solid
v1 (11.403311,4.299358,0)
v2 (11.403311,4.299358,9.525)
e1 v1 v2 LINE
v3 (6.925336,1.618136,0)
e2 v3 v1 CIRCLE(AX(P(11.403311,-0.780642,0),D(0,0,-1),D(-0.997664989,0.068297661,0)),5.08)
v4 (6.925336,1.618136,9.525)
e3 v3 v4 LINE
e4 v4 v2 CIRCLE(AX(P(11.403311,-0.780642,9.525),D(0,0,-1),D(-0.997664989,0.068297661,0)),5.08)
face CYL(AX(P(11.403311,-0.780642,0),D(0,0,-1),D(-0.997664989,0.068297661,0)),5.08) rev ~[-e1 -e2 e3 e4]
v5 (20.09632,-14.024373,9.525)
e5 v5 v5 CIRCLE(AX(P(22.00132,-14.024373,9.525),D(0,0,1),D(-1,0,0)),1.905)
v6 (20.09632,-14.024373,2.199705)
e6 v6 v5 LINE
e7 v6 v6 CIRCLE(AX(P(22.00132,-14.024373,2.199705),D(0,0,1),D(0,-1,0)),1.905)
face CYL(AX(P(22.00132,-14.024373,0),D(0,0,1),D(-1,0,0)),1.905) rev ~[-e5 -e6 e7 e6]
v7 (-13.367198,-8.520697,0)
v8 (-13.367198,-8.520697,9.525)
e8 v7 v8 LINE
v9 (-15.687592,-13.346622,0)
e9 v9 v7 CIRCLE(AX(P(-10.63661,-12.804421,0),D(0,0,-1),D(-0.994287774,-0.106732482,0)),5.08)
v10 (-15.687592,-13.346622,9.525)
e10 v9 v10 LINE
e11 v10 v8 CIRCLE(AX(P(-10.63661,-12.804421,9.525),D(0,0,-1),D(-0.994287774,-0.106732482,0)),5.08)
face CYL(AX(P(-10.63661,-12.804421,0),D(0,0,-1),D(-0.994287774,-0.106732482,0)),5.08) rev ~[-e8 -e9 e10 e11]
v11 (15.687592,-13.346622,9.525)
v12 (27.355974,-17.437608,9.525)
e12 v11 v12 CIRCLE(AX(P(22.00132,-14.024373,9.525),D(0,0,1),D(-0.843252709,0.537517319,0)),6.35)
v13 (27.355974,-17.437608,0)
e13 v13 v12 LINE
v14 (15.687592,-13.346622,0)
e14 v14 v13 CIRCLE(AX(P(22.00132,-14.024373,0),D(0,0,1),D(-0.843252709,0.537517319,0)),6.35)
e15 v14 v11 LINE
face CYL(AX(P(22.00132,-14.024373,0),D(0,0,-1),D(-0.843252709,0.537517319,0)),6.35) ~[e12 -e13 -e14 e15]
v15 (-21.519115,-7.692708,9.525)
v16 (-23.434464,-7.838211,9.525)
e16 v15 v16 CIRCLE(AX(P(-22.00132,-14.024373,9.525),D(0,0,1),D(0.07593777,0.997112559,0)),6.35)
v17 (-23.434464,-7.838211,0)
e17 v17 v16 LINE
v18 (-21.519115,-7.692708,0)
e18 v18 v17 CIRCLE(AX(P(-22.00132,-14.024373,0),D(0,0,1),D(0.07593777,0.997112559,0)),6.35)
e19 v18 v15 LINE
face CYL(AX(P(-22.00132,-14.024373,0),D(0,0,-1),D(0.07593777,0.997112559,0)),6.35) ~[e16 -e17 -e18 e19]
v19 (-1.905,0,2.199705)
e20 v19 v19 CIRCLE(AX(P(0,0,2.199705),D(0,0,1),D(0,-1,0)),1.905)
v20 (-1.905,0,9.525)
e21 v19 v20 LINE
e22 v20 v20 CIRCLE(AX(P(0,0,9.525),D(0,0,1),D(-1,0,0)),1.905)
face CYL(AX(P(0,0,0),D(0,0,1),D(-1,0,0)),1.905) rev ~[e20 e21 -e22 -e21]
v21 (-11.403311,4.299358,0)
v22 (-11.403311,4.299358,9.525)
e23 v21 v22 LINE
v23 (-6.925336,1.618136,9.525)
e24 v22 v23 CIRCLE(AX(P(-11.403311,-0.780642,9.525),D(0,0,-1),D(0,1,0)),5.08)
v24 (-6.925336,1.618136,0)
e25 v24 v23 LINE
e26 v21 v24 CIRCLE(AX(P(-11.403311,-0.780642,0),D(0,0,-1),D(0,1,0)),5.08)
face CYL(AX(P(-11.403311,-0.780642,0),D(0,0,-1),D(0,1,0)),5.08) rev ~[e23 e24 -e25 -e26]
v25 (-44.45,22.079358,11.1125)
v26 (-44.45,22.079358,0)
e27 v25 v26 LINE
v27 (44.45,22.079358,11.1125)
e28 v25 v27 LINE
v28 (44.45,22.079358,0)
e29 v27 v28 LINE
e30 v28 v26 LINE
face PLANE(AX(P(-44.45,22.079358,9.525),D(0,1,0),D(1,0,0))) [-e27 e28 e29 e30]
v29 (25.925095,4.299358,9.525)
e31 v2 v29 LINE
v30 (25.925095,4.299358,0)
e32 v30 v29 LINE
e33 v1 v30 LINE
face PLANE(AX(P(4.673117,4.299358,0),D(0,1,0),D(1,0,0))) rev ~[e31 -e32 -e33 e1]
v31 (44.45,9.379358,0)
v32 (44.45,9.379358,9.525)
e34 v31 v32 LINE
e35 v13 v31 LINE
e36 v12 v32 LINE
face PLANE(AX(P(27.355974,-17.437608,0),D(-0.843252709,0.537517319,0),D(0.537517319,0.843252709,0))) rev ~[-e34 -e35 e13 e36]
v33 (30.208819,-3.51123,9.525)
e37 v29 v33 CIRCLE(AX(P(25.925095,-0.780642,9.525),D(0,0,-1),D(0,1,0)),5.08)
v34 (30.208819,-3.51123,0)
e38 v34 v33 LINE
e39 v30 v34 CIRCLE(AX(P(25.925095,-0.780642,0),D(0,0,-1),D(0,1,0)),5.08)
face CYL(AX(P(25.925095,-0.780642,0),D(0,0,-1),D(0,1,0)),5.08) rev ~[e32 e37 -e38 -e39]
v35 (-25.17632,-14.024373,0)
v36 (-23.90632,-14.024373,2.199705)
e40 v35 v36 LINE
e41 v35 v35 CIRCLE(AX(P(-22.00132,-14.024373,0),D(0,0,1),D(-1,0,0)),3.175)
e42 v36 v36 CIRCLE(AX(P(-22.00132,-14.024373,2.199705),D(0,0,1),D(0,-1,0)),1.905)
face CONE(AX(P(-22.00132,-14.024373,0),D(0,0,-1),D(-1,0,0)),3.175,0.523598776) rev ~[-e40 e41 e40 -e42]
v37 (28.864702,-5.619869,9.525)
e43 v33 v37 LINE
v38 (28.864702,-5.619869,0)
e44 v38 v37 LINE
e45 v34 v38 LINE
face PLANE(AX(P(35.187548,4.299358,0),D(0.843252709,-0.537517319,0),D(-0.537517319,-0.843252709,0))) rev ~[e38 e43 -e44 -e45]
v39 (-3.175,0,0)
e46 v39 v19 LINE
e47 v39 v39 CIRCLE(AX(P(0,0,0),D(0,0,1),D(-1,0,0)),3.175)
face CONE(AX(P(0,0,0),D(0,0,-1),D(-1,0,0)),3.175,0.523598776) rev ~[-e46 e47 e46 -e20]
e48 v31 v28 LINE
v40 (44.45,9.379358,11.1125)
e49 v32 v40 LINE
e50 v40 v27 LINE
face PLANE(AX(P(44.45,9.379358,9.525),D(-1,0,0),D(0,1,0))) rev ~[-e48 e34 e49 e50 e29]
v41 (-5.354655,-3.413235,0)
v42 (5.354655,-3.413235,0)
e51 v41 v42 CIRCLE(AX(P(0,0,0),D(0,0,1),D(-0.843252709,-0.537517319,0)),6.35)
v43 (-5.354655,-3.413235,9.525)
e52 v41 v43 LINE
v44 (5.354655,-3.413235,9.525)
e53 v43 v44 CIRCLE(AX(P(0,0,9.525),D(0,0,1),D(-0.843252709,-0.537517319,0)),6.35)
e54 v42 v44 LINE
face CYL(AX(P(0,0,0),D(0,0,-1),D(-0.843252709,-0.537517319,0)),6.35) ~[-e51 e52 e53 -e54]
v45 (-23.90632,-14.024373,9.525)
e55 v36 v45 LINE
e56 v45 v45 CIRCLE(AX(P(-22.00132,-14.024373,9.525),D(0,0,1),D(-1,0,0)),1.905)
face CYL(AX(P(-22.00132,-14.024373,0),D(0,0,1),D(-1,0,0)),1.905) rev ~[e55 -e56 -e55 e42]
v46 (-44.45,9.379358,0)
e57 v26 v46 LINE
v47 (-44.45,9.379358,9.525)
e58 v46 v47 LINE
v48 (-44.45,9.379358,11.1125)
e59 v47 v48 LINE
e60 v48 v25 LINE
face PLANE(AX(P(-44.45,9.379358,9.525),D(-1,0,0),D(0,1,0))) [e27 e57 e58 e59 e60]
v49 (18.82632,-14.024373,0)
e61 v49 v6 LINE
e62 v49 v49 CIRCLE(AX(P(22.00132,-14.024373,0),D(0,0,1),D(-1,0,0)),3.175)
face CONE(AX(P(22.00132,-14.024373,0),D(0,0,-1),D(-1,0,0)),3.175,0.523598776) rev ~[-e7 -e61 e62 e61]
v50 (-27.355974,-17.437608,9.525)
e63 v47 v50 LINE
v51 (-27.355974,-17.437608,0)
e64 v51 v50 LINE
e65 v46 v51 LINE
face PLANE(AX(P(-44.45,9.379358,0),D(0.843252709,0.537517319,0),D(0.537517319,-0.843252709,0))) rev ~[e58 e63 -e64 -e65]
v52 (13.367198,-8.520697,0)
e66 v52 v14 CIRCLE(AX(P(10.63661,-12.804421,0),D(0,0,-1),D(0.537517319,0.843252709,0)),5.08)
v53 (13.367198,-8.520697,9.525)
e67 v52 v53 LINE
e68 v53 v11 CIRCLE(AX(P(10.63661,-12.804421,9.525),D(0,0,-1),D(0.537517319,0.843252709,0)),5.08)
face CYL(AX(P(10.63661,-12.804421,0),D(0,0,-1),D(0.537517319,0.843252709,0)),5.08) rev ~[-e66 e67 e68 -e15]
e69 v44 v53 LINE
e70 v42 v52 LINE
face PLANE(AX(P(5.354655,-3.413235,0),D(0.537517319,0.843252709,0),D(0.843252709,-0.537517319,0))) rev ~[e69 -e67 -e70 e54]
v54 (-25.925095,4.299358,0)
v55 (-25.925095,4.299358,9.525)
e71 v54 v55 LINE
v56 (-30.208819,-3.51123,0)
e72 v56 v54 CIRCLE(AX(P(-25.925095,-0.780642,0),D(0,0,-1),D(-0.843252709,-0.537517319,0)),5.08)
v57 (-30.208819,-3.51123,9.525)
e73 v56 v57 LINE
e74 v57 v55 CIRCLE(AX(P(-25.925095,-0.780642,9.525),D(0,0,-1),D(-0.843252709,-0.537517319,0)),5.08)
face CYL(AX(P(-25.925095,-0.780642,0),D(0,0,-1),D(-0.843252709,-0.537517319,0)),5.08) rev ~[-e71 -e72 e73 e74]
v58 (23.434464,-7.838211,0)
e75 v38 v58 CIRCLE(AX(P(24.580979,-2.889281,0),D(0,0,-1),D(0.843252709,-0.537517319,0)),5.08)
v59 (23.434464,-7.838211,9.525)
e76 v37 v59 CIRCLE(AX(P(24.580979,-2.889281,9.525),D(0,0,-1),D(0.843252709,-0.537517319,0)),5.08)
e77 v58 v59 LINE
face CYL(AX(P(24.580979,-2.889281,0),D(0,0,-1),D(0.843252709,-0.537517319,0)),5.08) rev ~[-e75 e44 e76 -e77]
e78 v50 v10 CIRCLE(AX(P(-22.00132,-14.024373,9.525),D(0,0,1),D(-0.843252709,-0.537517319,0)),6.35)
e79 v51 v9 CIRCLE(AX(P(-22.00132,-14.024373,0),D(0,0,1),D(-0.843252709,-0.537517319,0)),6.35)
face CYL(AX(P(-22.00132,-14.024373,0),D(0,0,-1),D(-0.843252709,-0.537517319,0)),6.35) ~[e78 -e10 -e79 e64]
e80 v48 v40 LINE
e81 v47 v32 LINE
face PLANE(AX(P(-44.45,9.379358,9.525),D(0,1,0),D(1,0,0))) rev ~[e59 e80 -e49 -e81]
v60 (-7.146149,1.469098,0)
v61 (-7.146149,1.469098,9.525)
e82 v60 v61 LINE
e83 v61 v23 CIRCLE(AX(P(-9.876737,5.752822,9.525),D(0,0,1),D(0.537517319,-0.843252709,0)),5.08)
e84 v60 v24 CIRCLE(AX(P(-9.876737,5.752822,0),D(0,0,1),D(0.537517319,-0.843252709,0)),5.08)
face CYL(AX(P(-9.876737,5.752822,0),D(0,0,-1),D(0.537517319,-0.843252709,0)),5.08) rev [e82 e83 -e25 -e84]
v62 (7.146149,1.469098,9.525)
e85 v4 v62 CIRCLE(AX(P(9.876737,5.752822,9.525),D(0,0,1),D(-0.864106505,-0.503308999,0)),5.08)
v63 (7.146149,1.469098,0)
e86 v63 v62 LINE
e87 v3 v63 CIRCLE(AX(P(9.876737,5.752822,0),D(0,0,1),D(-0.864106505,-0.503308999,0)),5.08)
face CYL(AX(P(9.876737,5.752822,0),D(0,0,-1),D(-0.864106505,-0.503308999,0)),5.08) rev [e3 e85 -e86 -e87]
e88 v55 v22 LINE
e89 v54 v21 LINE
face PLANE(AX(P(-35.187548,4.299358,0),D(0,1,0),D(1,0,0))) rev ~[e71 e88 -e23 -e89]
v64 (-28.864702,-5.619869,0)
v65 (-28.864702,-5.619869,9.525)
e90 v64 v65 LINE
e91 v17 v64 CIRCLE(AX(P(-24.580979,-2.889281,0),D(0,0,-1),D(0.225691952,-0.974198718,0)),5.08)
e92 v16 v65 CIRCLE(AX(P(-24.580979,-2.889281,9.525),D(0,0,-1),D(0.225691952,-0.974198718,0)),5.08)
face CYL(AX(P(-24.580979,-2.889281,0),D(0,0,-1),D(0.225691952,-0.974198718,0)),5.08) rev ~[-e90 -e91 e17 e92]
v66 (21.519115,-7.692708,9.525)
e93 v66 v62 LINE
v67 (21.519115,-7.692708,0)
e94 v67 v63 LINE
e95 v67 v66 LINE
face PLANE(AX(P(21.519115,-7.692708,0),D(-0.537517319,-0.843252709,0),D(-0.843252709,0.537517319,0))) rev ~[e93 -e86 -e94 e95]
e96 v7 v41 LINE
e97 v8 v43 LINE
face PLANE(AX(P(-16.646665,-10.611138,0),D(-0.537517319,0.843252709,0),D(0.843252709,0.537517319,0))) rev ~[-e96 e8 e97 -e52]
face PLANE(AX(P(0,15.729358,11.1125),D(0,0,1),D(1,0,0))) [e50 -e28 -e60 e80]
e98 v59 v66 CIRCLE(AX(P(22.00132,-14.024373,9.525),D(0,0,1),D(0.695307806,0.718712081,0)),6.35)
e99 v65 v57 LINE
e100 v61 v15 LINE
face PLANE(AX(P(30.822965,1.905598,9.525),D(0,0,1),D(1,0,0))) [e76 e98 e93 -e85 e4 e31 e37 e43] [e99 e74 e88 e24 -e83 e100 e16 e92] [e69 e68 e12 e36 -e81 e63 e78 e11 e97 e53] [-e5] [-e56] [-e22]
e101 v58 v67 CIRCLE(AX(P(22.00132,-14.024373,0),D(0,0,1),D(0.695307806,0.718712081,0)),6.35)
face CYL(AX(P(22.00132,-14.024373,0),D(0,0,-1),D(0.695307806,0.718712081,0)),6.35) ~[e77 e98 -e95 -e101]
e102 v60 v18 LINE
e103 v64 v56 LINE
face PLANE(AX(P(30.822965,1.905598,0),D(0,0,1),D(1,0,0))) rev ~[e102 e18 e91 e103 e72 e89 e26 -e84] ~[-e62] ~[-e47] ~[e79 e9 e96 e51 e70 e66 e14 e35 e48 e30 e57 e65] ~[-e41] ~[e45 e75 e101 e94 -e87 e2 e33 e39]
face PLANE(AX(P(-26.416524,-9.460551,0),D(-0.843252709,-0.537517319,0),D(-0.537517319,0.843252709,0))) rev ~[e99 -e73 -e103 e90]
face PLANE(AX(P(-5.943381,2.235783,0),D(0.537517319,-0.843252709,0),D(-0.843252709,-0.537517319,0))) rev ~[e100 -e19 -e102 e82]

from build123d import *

# Parameters (mm, degrees)
F1_DEPTH       = 9.525
F2_T1_DEPTH    = 9.525
F3_W           = 88.9
F3_H           = 12.7
F4_DEPTH       = 1.5875
F6_D           = 3.81
F6_CSINK_D     = 6.35
F6_CSINK_ANGLE = 60


# Not quite as in the source:
# - a fillet or chamfer that OpenCascade refuses, or shapes differently, is made with other operations: its cross-section is extruded or revolved along the edge and cut away or added


with BuildPart() as f1:
    # F0 (on Top) → F1 (new body)
    with BuildSketch(Plane.XY):
        with BuildLine():
            Line((-16.6466649714, -10.6111378352), (-5.3546547037, -3.4132349764))
            ThreePointArc((-5.3546547037, -3.4132349764), (0, -6.35), (5.3546547037, -3.4132349764))
            Line((5.3546547037, -3.4132349764), (16.6466649714, -10.6111378352))
            ThreePointArc((16.6466649714, -10.6111378352), (18.5880846986, -19.3790275153), (27.3559743788, -17.437607788))
            Line((27.3559743788, -17.437607788), (44.45, 9.3793577389))
            Line((44.45, 9.3793577389), (44.45, 22.0793577389))
            Line((44.45, 22.0793577389), (-44.45, 22.0793577389))
            Line((-44.45, 22.0793577389), (-44.45, 9.3793577389))
            Line((-44.45, 9.3793577389), (-27.3559743788, -17.437607788))
            ThreePointArc((-27.3559743788, -17.437607788), (-18.5880846986, -19.3790275153), (-16.6466649714, -10.6111378352))
        make_face()
        with BuildLine():
            Line((-5.9433808033, 2.2357827771), (-21.519114834, -7.6927080628))
            ThreePointArc((-21.519114834, -7.6927080628), (-24.1573435523, -8.0515961507), (-26.4165242416, -9.4605510978))
            Line((-26.4165242416, -9.4605510978), (-35.1875477179, 4.2993577389))
            Line((-35.1875477179, 4.2993577389), (-4.6731170575, 4.2993577389))
            ThreePointArc((-4.6731170575, 4.2993577389), (-5.4075957794, 3.3287246638), (-5.9433808033, 2.2357827771))
        make_face(mode=Mode.SUBTRACT)
        with BuildLine():
            ThreePointArc((5.9433808033, 2.2357827771), (5.4075957794, 3.3287246638), (4.6731170575, 4.2993577389))
            Line((4.6731170575, 4.2993577389), (35.1875477179, 4.2993577389))
            Line((35.1875477179, 4.2993577389), (26.4165242416, -9.4605510978))
            ThreePointArc((26.4165242416, -9.4605510978), (24.1573435523, -8.0515961507), (21.519114834, -7.6927080628))
            Line((21.519114834, -7.6927080628), (5.9433808033, 2.2357827771))
        make_face(mode=Mode.SUBTRACT)
    extrude(amount=F1_DEPTH)

    # F2: fillet of radius 5.08 on 10 edges, made by hand

    # F2_s2 → F2_t1 (join)
    with BuildSketch(Plane.XY):
        with BuildLine():
            ThreePointArc((25.9250954358, 4.2993577389), (30.3791827129, 1.6622057751), (30.2088191987, -3.5112302422))
            Line((30.2088191987, -3.5112302422), (35.1875477179, 4.2993577389))
            Line((35.1875477179, 4.2993577389), (25.9250954358, 4.2993577389))
        make_face()
        with BuildLine():
            ThreePointArc((28.86470245, -5.6198694424), (26.5021187872, -7.5920062794), (23.4344635706, -7.8382109503))
            ThreePointArc((23.4344635706, -7.8382109503), (25.0359187955, -8.4464064996), (26.4165242416, -9.4605510978))
            Line((26.4165242416, -9.4605510978), (28.86470245, -5.6198694424))
        make_face()
        with BuildLine():
            ThreePointArc((6.3351726778, -0.433690145), (7.9360436505, 2.9321004414), (11.4033108201, 4.2993577389))
            Line((11.4033108201, 4.2993577389), (4.6731170575, 4.2993577389))
            ThreePointArc((4.6731170575, 4.2993577389), (5.9913309283, 2.1039139022), (6.3351726778, -0.433690145))
        make_face()
        with BuildLine():
            ThreePointArc((5.4870763048, 3.1960121441), (6.2133994477, 2.2333964199), (7.1461493675, 1.4690980964))
            Line((7.1461493675, 1.4690980964), (5.9433808033, 2.2357827771))
            ThreePointArc((5.9433808033, 2.2357827771), (5.7353594076, 2.7254637156), (5.4870763048, 3.1960121441))
        make_face()
        with BuildLine():
            ThreePointArc((-7.1461493675, 1.4690980964), (-6.2133994477, 2.2333964199), (-5.4870763048, 3.1960121441))
            ThreePointArc((-5.4870763048, 3.1960121441), (-5.7353594076, 2.7254637156), (-5.9433808033, 2.2357827771))
            Line((-5.9433808033, 2.2357827771), (-7.1461493675, 1.4690980964))
        make_face()
        with BuildLine():
            ThreePointArc((-11.4033108201, 4.2993577389), (-7.9360436505, 2.9321004414), (-6.3351726778, -0.433690145))
            ThreePointArc((-6.3351726778, -0.433690145), (-5.9913309283, 2.1039139022), (-4.6731170575, 4.2993577389))
            Line((-4.6731170575, 4.2993577389), (-11.4033108201, 4.2993577389))
        make_face()
        with BuildLine():
            ThreePointArc((-23.4344635706, -7.8382109503), (-26.5021187872, -7.5920062794), (-28.86470245, -5.6198694424))
            Line((-28.86470245, -5.6198694424), (-26.4165242416, -9.4605510978))
            ThreePointArc((-26.4165242416, -9.4605510978), (-25.0359187955, -8.4464064996), (-23.4344635706, -7.8382109503))
        make_face()
        with BuildLine():
            ThreePointArc((-30.2088191987, -3.5112302422), (-30.3791827129, 1.6622057751), (-25.9250954358, 4.2993577389))
            Line((-25.9250954358, 4.2993577389), (-35.1875477179, 4.2993577389))
            Line((-35.1875477179, 4.2993577389), (-30.2088191987, -3.5112302422))
        make_face()
        with BuildLine():
            ThreePointArc((-15.6875923106, -13.3466215538), (-15.2148846453, -10.6031015998), (-13.3671984002, -8.5206967846))
            Line((-13.3671984002, -8.5206967846), (-16.6466649714, -10.6111378352))
            ThreePointArc((-16.6466649714, -10.6111378352), (-16.0089492913, -11.9234213166), (-15.6875923106, -13.3466215538))
        make_face()
        with BuildLine():
            ThreePointArc((13.3671984002, -8.5206967846), (15.2148846453, -10.6031015998), (15.6875923106, -13.3466215538))
            ThreePointArc((15.6875923106, -13.3466215538), (16.0089492913, -11.9234213166), (16.6466649714, -10.6111378352))
            Line((16.6466649714, -10.6111378352), (13.3671984002, -8.5206967846))
        make_face()
    extrude(amount=F2_T1_DEPTH)

    # F3 (on face) → F4 (join)
    with BuildSketch(Plane.XY.offset(9.525)):
        with Locations((0, 15.7293577389)):
            Rectangle(F3_W, F3_H)
    extrude(amount=F4_DEPTH)

    # F6 (through all)
    with Locations(Plane(origin=(0, 0, 0), x_dir=(1, 0, 0), z_dir=(0, 0, -1))):
        with Locations((0, 0), (-22.0013196751, 14.0243728116), (22.0013196751, 14.0243728116)):
            CounterSinkHole(F6_D / 2, F6_CSINK_D / 2, counter_sink_angle=F6_CSINK_ANGLE)


solid = f1.part
